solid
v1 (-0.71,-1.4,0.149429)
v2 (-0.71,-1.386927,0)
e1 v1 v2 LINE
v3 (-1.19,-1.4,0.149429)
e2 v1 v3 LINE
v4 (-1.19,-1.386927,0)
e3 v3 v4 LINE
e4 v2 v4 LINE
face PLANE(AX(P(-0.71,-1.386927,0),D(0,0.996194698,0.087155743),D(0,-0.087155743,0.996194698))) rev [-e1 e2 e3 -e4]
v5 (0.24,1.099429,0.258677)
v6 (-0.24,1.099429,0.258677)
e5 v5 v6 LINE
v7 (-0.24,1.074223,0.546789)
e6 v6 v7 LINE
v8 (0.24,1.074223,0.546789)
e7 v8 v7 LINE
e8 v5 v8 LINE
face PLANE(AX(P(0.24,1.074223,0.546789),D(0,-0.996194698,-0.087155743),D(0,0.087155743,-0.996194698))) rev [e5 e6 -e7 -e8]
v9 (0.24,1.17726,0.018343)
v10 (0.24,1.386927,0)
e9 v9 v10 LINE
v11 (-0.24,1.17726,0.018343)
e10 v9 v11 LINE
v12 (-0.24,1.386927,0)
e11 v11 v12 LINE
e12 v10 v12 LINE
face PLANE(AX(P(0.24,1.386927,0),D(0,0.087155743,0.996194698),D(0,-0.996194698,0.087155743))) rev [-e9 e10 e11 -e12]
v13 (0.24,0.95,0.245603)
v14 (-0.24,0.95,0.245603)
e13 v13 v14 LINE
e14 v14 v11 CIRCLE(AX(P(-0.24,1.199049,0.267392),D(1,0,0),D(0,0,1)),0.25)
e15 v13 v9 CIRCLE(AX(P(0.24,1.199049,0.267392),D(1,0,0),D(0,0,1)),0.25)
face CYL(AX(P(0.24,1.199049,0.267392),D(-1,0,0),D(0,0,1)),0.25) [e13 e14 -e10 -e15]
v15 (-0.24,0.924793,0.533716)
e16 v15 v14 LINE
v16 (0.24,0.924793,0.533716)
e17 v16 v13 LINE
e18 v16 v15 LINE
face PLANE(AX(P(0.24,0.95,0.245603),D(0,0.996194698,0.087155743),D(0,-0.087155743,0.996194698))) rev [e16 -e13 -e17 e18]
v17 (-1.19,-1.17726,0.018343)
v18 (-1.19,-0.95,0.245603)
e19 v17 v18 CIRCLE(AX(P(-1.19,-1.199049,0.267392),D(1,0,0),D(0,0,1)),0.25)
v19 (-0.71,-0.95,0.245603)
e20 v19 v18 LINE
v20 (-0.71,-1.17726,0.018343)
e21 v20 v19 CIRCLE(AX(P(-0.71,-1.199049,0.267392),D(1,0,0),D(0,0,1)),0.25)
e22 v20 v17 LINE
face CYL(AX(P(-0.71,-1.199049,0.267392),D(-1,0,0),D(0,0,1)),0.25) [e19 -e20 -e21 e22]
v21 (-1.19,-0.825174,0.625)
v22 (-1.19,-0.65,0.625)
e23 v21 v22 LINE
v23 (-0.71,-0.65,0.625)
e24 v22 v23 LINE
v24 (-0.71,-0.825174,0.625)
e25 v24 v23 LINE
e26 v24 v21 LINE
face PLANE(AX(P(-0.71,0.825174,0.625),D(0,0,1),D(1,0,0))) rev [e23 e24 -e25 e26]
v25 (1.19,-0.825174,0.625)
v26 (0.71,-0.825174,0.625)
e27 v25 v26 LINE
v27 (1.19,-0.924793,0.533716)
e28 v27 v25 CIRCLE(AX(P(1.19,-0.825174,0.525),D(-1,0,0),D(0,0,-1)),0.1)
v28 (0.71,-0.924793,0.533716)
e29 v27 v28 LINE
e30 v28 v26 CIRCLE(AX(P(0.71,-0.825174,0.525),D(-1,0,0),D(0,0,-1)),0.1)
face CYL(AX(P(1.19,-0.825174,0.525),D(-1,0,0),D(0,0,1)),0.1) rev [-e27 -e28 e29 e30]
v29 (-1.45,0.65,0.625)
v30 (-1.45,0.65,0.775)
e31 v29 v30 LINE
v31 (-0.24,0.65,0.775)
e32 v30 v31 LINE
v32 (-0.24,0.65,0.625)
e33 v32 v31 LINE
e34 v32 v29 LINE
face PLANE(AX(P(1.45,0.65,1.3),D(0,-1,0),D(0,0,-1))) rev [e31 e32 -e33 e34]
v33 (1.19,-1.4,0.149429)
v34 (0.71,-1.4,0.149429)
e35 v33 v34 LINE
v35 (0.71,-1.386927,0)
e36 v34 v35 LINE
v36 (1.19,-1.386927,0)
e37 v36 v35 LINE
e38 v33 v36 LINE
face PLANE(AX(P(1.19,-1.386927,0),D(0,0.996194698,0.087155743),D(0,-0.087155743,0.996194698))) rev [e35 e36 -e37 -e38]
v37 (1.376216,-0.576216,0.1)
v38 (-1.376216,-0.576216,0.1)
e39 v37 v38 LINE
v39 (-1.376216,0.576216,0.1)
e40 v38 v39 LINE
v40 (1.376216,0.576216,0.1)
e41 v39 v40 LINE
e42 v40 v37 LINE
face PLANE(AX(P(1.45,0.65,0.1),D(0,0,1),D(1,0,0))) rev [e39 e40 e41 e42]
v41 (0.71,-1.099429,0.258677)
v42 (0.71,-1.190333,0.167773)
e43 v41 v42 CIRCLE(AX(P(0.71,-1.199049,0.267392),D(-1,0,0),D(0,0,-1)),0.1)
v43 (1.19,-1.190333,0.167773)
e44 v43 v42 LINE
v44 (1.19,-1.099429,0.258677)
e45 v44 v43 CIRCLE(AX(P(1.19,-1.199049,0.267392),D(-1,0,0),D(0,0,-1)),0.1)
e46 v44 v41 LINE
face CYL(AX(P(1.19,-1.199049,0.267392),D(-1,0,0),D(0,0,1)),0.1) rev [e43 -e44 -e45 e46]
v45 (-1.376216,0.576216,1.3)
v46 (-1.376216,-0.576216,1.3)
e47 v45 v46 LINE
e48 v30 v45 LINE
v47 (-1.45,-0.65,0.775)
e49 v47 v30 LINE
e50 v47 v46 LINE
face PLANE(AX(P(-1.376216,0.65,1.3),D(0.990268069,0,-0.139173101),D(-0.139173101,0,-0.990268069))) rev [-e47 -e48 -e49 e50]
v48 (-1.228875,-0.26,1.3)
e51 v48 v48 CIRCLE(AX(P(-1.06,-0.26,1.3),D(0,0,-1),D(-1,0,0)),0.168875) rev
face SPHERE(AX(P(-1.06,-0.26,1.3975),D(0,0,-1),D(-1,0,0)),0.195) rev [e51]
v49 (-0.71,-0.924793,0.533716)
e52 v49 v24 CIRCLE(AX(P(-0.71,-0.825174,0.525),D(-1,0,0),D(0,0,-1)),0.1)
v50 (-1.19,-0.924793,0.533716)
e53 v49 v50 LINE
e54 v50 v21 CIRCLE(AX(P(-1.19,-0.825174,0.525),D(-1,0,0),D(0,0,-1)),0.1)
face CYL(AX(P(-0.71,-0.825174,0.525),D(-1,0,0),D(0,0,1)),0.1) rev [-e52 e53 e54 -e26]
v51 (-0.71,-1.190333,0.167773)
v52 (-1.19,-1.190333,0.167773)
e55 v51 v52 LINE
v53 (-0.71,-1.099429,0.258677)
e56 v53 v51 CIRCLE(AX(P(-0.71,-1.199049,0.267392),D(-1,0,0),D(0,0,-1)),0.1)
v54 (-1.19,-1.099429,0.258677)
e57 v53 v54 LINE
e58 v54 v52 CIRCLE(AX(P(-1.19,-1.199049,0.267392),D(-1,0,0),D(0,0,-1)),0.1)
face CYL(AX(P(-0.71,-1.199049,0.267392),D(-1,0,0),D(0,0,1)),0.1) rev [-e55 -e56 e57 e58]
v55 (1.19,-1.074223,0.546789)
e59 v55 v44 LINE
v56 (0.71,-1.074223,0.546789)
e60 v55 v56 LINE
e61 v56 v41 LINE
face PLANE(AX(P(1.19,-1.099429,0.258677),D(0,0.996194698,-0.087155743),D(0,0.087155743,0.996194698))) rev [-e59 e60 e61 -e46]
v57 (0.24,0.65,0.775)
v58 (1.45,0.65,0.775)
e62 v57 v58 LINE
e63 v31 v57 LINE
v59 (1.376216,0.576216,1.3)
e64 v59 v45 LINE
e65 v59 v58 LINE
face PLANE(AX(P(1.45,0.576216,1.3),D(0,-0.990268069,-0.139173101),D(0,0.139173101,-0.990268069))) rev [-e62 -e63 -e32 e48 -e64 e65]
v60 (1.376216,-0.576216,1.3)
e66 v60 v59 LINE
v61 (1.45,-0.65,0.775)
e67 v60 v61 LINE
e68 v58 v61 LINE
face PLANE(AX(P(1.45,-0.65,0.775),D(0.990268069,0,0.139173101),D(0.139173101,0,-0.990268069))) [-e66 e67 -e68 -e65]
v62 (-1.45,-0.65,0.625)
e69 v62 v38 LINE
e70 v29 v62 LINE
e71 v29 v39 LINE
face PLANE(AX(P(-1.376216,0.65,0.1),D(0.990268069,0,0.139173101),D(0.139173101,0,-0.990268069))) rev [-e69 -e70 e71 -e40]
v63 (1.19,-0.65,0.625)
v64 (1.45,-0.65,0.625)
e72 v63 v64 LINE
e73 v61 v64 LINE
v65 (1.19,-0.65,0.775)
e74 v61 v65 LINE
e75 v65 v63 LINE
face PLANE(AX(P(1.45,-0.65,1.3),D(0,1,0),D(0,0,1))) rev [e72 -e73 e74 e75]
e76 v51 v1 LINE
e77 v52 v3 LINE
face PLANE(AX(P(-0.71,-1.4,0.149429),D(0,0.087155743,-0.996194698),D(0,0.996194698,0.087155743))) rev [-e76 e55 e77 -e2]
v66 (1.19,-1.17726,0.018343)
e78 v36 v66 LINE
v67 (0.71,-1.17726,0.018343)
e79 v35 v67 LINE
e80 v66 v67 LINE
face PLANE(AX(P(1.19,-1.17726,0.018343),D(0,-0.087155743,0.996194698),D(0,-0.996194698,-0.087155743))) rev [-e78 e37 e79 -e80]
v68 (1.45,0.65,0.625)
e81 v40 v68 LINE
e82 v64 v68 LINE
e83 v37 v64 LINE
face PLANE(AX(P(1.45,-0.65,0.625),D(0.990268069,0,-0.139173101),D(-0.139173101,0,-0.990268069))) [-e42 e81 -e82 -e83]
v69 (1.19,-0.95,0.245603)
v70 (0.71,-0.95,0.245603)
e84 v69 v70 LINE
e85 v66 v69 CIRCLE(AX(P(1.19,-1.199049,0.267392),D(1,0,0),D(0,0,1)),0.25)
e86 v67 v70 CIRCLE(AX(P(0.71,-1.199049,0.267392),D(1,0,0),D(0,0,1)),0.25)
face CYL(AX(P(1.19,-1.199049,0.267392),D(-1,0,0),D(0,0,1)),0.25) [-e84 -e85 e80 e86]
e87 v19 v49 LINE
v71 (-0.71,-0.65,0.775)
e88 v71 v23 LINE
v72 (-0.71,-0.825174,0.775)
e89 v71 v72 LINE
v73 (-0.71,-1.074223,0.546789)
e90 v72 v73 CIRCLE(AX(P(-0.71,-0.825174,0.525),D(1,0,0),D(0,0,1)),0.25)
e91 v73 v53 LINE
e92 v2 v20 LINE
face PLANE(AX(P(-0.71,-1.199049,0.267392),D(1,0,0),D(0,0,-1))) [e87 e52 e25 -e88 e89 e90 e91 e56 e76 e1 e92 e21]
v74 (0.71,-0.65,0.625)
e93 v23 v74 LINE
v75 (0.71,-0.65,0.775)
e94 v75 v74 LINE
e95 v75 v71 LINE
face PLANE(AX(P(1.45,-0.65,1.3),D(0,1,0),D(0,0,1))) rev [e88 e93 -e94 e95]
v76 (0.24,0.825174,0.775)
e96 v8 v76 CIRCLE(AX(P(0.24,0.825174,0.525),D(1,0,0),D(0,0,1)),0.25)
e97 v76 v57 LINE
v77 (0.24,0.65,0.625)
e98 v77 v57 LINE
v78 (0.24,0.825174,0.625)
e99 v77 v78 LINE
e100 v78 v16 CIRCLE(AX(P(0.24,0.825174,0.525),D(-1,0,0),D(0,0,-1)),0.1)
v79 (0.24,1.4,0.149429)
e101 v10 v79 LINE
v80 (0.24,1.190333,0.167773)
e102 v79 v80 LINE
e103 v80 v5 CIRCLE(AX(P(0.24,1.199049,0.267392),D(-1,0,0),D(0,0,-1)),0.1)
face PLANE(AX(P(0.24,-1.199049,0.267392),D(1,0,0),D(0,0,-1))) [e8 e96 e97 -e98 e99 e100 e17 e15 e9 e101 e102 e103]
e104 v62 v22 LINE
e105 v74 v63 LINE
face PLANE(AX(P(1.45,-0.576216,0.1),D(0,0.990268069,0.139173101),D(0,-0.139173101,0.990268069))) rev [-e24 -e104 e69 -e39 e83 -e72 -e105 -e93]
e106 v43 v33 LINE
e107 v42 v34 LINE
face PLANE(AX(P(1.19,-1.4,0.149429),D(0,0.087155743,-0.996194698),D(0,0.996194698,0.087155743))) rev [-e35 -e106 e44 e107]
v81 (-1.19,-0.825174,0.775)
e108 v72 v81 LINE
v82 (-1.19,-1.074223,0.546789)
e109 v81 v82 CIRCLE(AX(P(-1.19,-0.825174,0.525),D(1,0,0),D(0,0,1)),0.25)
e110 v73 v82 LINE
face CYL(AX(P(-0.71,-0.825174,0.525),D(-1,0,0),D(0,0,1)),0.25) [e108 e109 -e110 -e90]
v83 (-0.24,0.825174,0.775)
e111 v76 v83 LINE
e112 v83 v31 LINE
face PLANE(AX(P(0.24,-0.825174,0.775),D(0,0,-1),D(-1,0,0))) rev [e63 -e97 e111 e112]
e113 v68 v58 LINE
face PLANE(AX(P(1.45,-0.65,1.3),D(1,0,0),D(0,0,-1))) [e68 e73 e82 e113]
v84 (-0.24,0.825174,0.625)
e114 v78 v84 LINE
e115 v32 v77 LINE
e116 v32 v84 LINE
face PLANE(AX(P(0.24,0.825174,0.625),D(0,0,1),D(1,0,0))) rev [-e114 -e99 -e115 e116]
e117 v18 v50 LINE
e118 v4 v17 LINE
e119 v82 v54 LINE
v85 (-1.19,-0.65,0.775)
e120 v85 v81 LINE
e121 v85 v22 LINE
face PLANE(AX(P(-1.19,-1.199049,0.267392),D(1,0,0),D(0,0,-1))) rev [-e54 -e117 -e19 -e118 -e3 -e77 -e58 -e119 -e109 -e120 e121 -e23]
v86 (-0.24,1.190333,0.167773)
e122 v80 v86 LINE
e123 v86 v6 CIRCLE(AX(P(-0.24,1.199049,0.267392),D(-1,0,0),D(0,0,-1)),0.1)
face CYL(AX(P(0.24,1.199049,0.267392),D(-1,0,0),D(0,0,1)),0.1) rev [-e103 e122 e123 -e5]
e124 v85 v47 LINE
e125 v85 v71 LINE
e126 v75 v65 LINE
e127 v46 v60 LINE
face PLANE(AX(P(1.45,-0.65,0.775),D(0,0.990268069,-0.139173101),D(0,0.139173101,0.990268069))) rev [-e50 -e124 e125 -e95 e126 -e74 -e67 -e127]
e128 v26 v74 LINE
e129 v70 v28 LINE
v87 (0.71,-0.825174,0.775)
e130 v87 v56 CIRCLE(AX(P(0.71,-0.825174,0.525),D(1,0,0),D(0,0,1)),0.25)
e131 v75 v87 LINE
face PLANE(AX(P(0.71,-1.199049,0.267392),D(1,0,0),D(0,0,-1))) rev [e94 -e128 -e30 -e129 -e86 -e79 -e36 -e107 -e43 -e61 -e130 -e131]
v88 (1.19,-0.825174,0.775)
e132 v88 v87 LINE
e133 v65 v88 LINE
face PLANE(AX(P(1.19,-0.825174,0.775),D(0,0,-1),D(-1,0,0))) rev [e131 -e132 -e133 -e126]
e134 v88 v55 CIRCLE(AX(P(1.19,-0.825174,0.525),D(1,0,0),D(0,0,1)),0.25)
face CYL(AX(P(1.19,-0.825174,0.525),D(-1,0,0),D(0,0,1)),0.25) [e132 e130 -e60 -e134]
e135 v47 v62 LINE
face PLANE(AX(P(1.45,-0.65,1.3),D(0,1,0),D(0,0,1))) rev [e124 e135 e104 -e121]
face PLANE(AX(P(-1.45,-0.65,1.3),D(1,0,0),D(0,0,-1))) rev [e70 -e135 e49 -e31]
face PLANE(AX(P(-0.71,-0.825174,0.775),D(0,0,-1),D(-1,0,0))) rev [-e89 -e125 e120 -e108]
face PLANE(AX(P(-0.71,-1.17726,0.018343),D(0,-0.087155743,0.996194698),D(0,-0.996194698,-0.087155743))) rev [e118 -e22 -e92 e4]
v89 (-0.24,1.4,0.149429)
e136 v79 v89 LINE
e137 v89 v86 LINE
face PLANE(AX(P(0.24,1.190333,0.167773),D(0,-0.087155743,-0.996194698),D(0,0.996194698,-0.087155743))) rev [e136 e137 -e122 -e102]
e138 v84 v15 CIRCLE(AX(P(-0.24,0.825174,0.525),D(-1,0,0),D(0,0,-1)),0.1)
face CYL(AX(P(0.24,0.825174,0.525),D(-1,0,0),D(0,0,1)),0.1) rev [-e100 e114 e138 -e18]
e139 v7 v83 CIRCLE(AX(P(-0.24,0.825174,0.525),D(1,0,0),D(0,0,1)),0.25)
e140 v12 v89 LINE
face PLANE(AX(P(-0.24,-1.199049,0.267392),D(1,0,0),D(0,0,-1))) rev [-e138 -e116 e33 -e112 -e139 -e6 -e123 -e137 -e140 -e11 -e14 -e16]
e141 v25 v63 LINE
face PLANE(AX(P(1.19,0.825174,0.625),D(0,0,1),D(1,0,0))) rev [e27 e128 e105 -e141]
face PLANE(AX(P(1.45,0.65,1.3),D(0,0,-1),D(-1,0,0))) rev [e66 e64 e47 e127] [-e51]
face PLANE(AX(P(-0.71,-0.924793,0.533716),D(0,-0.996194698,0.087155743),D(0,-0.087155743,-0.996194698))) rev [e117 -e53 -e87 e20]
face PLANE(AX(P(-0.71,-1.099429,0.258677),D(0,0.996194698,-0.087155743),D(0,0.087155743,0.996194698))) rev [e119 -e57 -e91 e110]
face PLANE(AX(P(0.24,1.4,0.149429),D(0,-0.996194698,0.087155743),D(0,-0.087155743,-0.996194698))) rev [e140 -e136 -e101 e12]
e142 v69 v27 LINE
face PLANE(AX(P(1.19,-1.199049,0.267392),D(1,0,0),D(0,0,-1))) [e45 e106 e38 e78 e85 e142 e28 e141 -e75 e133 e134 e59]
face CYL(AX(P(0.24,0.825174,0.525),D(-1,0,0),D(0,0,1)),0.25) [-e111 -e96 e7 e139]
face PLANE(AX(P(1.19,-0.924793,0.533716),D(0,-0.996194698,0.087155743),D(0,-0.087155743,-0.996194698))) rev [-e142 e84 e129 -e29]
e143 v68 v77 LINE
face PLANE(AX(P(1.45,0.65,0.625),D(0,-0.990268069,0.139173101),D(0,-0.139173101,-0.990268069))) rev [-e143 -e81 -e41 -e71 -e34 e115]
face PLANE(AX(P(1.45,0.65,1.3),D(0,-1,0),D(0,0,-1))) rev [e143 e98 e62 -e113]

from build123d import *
from OCP.BRepFilletAPI import BRepFilletAPI_MakeChamfer
from build123d.topology import SkipClean

# Parameters (mm, degrees)
BODYWXH_W               = 1.2
BODYWXH_H               = 1.3
BOSS_BODY_DEPTH         = 1.45
CHAMFER1_SIZE           = 0.525
CHAMFER1_SIZE2          = 0.073783938
PINS_DEPTH              = 0.48
PATTERNLEADS_COUNT      = 3
PATTERNLEADS_PITCH      = 0.95
DELETEFACE1_START       = 0.65
DELETEFACE1_OUTLINE_W   = 0.48
DELETEFACE1_OUTLINE_H   = 1.775
DELETEFACE1_DEPTH       = 0.75
DELETEFACE1_START_2     = -1.4
DELETEFACE1_2_OUTLINE_W = 0.48
DELETEFACE1_2_OUTLINE_H = 1.775
DELETEFACE1_2_DEPTH     = 0.75


# Read off the part's stored shape, not the designer's step: DeleteFace1
with BuildPart() as part:
    # BodyWxH → Boss-Body (new, symmetric)
    with BuildSketch(Plane(origin=(0, 0, 0), x_dir=(0, 0, -1), z_dir=(1, 0, 0))):
        with Locations((-0.7, 0)):
            Rectangle(BODYWXH_W, BODYWXH_H)
    extrude(amount=BOSS_BODY_DEPTH, both=True)

    # Chamfer1: one chamfer whose edges measure the first distance from different faces: ONE call of the kernel's chamfer builder (chamfer() names one face for all edges)
    chamfer1_edges_1 = [part.edges().sort_by_distance(p)[0] for p in [
        (1.45, 0, 0.1),
        (1.45, 0, 1.3),
    ]]
    chamfer1_side_1 = [part.faces().sort_by_distance(p)[0] for p in [
        (1.45, 0, 0.7),
    ]]
    chamfer1_edges_2 = [part.edges().sort_by_distance(p)[0] for p in [
        (-1.45, 0, 0.1),
        (-1.45, 0, 1.3),
    ]]
    chamfer1_side_2 = [part.faces().sort_by_distance(p)[0] for p in [
        (-1.45, 0, 0.7),
    ]]
    chamfer1_edges_3 = [part.edges().sort_by_distance(p)[0] for p in [
        (0, 0.65, 1.3),
        (0, 0.65, 0.1),
    ]]
    chamfer1_side_3 = [part.faces().sort_by_distance(p)[0] for p in [
        (0, 0.65, 0.7),
    ]]
    chamfer1_edges_4 = [part.edges().sort_by_distance(p)[0] for p in [
        (0, -0.65, 0.1),
        (0, -0.65, 1.3),
    ]]
    chamfer1_side_4 = [part.faces().sort_by_distance(p)[0] for p in [
        (0, -0.65, 0.7),
    ]]
    chamfer1 = BRepFilletAPI_MakeChamfer(part.part.solid().wrapped)
    for e in chamfer1_edges_1:
        chamfer1.Add(CHAMFER1_SIZE, CHAMFER1_SIZE2, e.wrapped, chamfer1_side_1[0].wrapped)  # the first distance lies on this face
    for e in chamfer1_edges_2:
        chamfer1.Add(CHAMFER1_SIZE, CHAMFER1_SIZE2, e.wrapped, chamfer1_side_2[0].wrapped)  # the first distance lies on this face
    for e in chamfer1_edges_3:
        chamfer1.Add(CHAMFER1_SIZE, CHAMFER1_SIZE2, e.wrapped, chamfer1_side_3[0].wrapped)  # the first distance lies on this face
    for e in chamfer1_edges_4:
        chamfer1.Add(CHAMFER1_SIZE, CHAMFER1_SIZE2, e.wrapped, chamfer1_side_4[0].wrapped)  # the first distance lies on this face
    add(Compound.cast(chamfer1.Shape()), mode=Mode.REPLACE)

    # LeadCross → Pins (add)
    with BuildSketch(Plane(origin=(-1.19, 0, 0), x_dir=(0, 0, -1), z_dir=(1, 0, 0))):
        with BuildLine():
            Line((0, -1.386926639), (-0.149429205, -1.4))
            Line((-0.149429205, -1.4), (-0.167772682, -1.1903331))
            ThreePointArc((-0.167772682, -1.1903331), (-0.196681473, -1.128337996), (-0.258676577, -1.099429205))
            Line((-0.258676577, -1.099429205), (-0.546788936, -1.07422264))
            ThreePointArc((-0.546788936, -1.07422264), (-0.709319334, -0.994071517), (-0.775, -0.825173965))
            Line((-0.775, -0.825173965), (-0.775, 0.825173965))
            ThreePointArc((-0.775, 0.825173965), (-0.709319334, 0.994071517), (-0.546788936, 1.07422264))
            Line((-0.546788936, 1.07422264), (-0.258676577, 1.099429205))
            ThreePointArc((-0.258676577, 1.099429205), (-0.196681473, 1.128337996), (-0.167772682, 1.1903331))
            Line((-0.167772682, 1.1903331), (-0.149429205, 1.4))
            Line((-0.149429205, 1.4), (0, 1.386926639))
            Line((0, 1.386926639), (-0.018343477, 1.177259739))
            ThreePointArc((-0.018343477, 1.177259739), (-0.090615456, 1.022271979), (-0.245603216, 0.95))
            Line((-0.245603216, 0.95), (-0.533715574, 0.924793435))
            ThreePointArc((-0.533715574, 0.924793435), (-0.598727734, 0.892732986), (-0.625, 0.825173965))
            Line((-0.625, 0.825173965), (-0.625, -0.825173965))
            ThreePointArc((-0.625, -0.825173965), (-0.598727734, -0.892732986), (-0.533715574, -0.924793435))
            Line((-0.533715574, -0.924793435), (-0.245603216, -0.95))
            ThreePointArc((-0.245603216, -0.95), (-0.090615456, -1.022271979), (-0.018343477, -1.177259739))
            Line((-0.018343477, -1.177259739), (0, -1.386926639))
        make_face()
    pins = extrude(amount=PINS_DEPTH)

    # PatternLeads: Pins ×3
    with Locations(*[(i * PATTERNLEADS_PITCH, 0, 0) for i in range(1, PATTERNLEADS_COUNT)]):
        add(pins)

    # Pin1Indent → Cut-Pin1Indent (revolve, cut)
    with SkipClean():  # the faces are left unmerged after this step: merging them gives an invalid solid
        with BuildSketch(Plane(origin=(-1.06, 0, 0), x_dir=(0, 0, -1), z_dir=(1, 0, 0))):
            with BuildLine():
                Line((-1.3975, -0.065), (-1.3975, -0.455))
                ThreePointArc((-1.3975, -0.455), (-1.2025, -0.26), (-1.3975, -0.065))
            make_face()
        revolve(axis=Axis((-1.06, -0.065, 1.3975), (0, -1, 0)), mode=Mode.SUBTRACT)

    # DeleteFace1 outline → DeleteFace1 (cut)
    with SkipClean():  # the faces are left unmerged after this step: merging them gives an invalid solid
        with BuildSketch(Plane(origin=(0, 0, 0), x_dir=(1, 0, 0), z_dir=(0, 1, 0)).offset(DELETEFACE1_START)):
            with Locations((-0.95, 0.1125)):
                Rectangle(DELETEFACE1_OUTLINE_W, DELETEFACE1_OUTLINE_H)
            with Locations((0.95, 0.1125)):
                Rectangle(DELETEFACE1_OUTLINE_W, DELETEFACE1_OUTLINE_H)
        extrude(amount=DELETEFACE1_DEPTH, mode=Mode.SUBTRACT)

    # DeleteFace1 2 outline → DeleteFace1 2 (cut)
    with SkipClean():  # the faces are left unmerged after this step: merging them gives an invalid solid
        with BuildSketch(Plane(origin=(0, 0, 0), x_dir=(1, 0, 0), z_dir=(0, 1, 0)).offset(DELETEFACE1_START_2)):
            with Locations((0, 0.1125)):
                Rectangle(DELETEFACE1_2_OUTLINE_W, DELETEFACE1_2_OUTLINE_H)
        extrude(amount=DELETEFACE1_2_DEPTH, mode=Mode.SUBTRACT)


solid = part.part
